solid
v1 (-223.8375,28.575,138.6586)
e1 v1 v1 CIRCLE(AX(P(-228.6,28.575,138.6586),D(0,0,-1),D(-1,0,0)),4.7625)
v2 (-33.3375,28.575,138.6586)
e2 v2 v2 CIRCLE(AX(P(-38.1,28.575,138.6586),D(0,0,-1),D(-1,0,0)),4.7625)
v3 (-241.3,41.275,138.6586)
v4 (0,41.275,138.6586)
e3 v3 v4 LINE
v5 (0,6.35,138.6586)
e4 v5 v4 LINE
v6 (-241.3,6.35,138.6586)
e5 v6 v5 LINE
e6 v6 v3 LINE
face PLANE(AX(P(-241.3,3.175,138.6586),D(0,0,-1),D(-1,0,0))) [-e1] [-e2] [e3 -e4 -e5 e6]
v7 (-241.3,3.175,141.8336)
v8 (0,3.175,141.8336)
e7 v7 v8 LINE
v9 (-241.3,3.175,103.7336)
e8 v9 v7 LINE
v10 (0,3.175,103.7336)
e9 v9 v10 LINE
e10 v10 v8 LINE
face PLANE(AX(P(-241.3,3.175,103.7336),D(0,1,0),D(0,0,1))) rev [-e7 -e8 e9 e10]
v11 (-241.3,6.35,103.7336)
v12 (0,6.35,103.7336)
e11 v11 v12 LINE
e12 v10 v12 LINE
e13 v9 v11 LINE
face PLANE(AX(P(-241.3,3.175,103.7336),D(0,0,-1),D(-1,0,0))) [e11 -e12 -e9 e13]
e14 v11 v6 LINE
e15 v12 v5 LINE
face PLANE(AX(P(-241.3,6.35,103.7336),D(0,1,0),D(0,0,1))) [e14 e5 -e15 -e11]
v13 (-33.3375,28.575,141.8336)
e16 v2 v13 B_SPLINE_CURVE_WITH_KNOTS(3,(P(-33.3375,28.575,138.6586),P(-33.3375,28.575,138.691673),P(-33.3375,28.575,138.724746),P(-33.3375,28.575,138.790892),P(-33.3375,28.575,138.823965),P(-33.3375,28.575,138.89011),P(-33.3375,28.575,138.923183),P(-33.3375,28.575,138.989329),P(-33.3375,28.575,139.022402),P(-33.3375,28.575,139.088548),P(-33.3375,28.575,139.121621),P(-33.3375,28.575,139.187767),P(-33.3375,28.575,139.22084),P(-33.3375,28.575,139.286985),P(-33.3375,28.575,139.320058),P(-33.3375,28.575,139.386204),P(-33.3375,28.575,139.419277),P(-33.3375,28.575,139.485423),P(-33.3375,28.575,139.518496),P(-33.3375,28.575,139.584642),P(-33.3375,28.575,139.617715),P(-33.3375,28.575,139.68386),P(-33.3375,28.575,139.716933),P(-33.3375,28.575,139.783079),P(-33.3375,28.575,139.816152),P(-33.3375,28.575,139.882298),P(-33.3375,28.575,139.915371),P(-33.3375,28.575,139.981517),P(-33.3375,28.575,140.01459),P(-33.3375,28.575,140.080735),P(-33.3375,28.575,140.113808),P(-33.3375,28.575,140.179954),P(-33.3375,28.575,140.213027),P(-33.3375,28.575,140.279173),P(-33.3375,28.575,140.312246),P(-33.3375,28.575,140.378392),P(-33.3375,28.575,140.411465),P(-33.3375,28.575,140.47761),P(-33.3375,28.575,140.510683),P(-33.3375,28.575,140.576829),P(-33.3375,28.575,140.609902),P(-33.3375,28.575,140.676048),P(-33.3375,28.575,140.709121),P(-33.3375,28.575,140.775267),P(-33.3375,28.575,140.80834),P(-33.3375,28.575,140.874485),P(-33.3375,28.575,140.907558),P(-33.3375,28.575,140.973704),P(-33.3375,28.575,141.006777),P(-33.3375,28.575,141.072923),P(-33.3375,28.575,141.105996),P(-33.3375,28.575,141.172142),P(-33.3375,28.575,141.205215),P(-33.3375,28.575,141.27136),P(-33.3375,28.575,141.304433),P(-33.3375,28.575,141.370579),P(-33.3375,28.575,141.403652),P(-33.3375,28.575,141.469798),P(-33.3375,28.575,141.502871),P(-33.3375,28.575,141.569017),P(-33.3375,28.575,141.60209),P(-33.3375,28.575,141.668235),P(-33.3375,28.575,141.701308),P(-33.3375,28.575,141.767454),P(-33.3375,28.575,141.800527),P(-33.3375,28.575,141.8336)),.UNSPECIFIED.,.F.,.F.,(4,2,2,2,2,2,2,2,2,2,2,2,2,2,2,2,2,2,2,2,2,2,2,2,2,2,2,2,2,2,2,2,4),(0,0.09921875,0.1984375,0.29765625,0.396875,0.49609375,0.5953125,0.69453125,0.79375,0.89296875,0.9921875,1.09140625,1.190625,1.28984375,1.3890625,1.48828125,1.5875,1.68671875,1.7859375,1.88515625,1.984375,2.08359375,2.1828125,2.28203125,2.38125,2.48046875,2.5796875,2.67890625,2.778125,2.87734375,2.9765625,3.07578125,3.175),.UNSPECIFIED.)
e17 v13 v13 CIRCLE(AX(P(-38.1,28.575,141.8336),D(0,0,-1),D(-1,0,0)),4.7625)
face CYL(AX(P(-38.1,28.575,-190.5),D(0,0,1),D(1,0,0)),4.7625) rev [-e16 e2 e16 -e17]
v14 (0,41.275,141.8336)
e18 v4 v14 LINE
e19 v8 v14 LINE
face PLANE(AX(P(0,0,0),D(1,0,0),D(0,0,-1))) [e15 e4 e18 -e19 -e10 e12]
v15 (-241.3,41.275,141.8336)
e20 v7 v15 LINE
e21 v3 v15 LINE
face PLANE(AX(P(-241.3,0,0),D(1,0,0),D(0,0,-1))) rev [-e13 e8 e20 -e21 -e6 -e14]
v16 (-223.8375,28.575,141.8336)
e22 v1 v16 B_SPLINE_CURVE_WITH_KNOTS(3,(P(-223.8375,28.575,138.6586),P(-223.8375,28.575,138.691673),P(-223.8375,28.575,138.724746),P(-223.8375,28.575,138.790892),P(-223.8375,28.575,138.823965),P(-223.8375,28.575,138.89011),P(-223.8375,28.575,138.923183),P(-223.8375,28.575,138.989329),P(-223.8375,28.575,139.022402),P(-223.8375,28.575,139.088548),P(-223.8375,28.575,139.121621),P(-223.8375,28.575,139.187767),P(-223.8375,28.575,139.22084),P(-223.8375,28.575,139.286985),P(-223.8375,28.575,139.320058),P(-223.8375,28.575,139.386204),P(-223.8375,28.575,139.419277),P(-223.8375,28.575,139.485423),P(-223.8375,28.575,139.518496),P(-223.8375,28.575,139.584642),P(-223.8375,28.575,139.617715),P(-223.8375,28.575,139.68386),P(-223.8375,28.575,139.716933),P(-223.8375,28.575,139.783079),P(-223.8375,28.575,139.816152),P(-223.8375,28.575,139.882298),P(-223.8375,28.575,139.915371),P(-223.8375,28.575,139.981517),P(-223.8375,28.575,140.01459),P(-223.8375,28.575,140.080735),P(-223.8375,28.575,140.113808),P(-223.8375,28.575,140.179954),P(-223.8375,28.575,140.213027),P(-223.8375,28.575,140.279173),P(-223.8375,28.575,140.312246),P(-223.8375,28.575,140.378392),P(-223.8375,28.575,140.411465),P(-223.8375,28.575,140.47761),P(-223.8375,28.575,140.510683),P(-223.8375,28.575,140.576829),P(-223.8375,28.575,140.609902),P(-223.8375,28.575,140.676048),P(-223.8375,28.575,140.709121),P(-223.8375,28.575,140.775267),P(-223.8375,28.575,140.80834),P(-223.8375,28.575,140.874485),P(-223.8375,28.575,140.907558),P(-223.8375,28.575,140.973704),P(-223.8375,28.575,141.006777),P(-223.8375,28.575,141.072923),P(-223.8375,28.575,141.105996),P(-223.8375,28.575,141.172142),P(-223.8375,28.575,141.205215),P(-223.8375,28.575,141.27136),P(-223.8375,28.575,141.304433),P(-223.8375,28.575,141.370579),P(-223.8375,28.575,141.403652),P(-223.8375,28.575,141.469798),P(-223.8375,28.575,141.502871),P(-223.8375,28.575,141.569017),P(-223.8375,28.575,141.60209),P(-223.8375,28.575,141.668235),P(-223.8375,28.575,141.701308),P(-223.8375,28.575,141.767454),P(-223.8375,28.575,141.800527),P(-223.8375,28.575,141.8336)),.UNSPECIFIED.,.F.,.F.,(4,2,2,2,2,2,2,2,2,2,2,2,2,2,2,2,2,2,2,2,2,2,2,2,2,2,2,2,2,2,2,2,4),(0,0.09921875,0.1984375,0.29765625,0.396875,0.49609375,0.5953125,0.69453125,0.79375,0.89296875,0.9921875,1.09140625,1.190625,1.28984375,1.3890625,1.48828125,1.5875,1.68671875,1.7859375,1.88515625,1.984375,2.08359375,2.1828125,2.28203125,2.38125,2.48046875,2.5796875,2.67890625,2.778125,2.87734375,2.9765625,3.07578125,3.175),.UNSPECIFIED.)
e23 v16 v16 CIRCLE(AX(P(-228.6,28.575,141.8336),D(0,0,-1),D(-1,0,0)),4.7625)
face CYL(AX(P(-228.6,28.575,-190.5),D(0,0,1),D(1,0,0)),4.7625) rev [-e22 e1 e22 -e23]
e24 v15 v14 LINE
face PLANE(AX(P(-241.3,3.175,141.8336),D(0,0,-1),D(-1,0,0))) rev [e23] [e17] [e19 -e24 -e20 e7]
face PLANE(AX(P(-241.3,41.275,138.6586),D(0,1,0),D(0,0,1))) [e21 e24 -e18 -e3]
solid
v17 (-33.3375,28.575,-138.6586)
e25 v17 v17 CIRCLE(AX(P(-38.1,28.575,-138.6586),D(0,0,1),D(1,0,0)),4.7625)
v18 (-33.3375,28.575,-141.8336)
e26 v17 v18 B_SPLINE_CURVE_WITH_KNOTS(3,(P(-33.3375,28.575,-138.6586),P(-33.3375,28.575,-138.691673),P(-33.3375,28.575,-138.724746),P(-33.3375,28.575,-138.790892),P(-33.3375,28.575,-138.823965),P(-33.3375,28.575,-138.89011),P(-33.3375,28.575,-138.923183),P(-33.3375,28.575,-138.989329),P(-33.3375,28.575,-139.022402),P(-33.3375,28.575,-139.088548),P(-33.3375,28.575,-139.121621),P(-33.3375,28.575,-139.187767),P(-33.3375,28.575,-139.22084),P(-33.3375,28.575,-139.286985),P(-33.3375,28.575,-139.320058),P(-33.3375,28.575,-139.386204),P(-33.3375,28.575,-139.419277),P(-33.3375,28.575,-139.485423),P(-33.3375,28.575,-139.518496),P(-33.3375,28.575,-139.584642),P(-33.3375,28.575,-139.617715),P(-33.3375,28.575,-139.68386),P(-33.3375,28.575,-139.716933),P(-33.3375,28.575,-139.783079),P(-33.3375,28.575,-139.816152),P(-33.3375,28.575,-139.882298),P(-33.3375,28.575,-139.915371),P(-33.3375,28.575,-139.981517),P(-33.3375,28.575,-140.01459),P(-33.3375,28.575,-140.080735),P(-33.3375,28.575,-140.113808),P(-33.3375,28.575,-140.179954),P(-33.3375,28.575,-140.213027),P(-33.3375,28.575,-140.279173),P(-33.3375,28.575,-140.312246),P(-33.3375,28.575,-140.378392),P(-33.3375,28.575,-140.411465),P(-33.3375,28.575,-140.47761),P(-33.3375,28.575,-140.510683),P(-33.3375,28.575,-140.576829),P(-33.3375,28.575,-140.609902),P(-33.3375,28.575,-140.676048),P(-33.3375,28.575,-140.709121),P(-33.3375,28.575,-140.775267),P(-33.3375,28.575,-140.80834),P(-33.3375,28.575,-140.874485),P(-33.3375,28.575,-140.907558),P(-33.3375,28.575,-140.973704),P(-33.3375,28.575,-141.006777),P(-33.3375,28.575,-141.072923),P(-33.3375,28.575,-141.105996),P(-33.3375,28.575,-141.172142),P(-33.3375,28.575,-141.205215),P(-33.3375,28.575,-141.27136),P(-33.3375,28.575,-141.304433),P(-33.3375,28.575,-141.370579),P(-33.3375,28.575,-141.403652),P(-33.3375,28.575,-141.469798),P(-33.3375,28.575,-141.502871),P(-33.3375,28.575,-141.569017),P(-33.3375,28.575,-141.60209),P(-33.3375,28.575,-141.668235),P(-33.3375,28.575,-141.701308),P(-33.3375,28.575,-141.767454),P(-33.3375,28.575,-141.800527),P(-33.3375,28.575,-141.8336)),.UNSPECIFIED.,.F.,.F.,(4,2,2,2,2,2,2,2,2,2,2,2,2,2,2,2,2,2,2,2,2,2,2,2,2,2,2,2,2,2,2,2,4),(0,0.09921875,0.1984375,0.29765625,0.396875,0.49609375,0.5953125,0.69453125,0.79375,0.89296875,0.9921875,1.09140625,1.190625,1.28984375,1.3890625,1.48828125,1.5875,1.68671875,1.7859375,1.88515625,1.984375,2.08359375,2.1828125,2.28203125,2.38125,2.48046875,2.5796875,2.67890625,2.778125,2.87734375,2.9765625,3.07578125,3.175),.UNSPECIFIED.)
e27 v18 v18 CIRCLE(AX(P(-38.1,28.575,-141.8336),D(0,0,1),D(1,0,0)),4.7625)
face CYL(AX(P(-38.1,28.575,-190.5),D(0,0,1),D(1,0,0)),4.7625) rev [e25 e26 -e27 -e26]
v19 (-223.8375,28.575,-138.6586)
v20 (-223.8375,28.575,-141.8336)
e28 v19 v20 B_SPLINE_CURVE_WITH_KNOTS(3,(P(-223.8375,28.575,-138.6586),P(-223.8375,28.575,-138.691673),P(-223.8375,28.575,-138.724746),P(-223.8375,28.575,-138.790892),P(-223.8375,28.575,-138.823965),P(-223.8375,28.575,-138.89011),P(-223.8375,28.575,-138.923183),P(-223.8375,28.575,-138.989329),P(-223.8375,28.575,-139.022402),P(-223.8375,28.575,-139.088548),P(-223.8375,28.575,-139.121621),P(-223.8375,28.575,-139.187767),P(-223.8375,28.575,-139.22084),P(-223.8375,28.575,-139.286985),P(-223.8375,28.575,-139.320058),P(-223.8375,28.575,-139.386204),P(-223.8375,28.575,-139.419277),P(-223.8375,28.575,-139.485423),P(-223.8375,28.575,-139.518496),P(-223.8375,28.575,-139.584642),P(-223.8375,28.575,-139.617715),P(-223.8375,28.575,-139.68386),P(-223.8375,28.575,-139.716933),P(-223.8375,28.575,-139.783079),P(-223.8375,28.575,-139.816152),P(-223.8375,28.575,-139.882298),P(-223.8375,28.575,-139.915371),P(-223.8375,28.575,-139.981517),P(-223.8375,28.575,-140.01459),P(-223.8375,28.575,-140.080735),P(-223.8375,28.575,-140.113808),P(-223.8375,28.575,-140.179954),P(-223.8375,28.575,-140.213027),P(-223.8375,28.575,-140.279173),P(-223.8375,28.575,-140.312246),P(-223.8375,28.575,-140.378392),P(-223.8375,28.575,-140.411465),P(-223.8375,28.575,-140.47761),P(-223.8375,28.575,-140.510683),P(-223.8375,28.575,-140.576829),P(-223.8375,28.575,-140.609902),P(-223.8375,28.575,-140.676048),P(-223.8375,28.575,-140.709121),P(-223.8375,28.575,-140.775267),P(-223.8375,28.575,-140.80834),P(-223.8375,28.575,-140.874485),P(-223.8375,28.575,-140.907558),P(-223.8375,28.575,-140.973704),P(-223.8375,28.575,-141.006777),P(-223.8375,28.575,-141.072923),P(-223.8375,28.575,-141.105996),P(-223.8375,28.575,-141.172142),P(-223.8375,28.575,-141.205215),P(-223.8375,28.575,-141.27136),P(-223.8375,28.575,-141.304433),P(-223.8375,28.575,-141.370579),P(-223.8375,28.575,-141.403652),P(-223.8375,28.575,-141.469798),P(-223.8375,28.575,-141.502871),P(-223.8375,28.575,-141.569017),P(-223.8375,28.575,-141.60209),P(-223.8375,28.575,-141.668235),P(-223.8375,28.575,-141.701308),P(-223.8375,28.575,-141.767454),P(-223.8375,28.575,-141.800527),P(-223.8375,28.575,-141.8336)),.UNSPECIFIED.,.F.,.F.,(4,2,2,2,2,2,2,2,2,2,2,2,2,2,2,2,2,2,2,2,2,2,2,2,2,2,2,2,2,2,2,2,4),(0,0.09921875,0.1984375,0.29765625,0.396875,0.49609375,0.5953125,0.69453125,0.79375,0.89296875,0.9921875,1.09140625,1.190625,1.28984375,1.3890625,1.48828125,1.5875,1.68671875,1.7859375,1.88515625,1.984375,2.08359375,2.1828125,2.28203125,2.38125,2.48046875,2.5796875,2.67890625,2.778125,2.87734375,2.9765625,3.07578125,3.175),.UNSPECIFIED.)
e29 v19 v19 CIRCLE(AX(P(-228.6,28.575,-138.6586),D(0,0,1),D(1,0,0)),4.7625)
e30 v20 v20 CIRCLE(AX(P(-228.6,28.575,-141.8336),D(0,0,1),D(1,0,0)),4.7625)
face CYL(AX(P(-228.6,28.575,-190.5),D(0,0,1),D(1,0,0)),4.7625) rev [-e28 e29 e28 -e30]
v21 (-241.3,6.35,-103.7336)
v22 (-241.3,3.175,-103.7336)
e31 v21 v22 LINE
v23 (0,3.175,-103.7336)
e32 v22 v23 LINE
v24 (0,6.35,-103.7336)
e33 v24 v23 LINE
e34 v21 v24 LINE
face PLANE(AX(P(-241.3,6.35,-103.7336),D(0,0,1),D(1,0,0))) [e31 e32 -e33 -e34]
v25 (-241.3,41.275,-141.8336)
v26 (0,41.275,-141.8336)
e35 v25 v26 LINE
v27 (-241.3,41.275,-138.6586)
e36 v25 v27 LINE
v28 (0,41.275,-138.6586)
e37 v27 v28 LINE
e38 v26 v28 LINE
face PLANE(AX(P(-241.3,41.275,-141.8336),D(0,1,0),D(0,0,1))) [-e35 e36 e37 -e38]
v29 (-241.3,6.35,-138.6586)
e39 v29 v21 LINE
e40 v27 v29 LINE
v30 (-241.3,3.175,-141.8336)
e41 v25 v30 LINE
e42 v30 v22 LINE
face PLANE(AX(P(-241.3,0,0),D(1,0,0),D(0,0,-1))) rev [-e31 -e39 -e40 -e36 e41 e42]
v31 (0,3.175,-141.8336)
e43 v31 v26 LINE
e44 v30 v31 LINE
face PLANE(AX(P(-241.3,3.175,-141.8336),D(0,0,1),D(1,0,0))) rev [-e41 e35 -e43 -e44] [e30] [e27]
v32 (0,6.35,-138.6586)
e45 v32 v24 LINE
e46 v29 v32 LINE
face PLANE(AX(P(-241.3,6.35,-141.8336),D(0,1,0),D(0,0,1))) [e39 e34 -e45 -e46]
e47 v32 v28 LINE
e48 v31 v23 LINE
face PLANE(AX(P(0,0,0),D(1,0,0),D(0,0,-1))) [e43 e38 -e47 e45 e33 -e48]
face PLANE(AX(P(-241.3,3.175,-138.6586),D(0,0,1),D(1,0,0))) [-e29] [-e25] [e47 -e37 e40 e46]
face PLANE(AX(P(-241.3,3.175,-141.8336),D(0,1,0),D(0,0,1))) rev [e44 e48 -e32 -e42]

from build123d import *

# Parameters (mm, degrees)
EXTRUDE_THIN1_DEPTH     = 190.5
EXTRUDE_THIN2_DEPTH     = 241.3
CUT_EXTRUDE3_DEPTH      = 311.192787835
CUT_EXTRUDE3_DEPTH_BACK = 311.192787835
SKETCH5_R               = 4.7625
CUT_EXTRUDE4_DEPTH      = 311.192787835
CUT_EXTRUDE4_DEPTH_BACK = 311.192787835
SKETCH6_W               = 38.1
SKETCH6_H               = 41.275


with BuildPart() as part:
    # Sketch1 → Extrude-Thin1 (new, symmetric)
    with BuildSketch(Plane.XY):
        Polygon((38.1, 0), (0, 0), (0, 38.1), (3.175, 38.1), (3.175, 3.175), (38.1, 3.175), align=None)
    extrude(amount=EXTRUDE_THIN1_DEPTH, both=True)

    # Sketch2 → Extrude-Thin2 (add)
    with BuildSketch(Plane.ZY):
        Polygon((103.7336, 3.175), (141.8336, 3.175), (141.8336, 41.275), (138.6586, 41.275), (138.6586, 6.35), (103.7336, 6.35), align=None)
        Polygon((-103.7336, 3.175), (-141.8336, 3.175), (-141.8336, 41.275), (-138.6586, 41.275), (-138.6586, 6.35), (-103.7336, 6.35), align=None)
    extrude(amount=EXTRUDE_THIN2_DEPTH)

    # Sketch5 → Cut-Extrude3 (cut, two sides: drawn at the far end of the back side and taken through both)
    with BuildSketch(Plane.XY.offset(-CUT_EXTRUDE3_DEPTH_BACK)):
        with Locations((-228.6, 28.575)):
            Circle(SKETCH5_R)
        with Locations((-38.1, 28.575)):
            Circle(SKETCH5_R)
    extrude(amount=CUT_EXTRUDE3_DEPTH + CUT_EXTRUDE3_DEPTH_BACK, mode=Mode.SUBTRACT)

    # Sketch6 → Cut-Extrude4 (cut, two sides: drawn at the far end of the back side and taken through both)
    with BuildSketch(Plane.XY.offset(-CUT_EXTRUDE4_DEPTH_BACK)):
        with Locations((19.05, 20.6375)):
            Rectangle(SKETCH6_W, SKETCH6_H)
    extrude(amount=CUT_EXTRUDE4_DEPTH + CUT_EXTRUDE4_DEPTH_BACK, mode=Mode.SUBTRACT)


with BuildPart() as cut_extrude4_piece_1:
    # of the separate pieces the step leaves, piece 1, a body of its own (cut_extrude4_pieces)
    add(part.part.solids().sort_by_distance((0, 3.175, 141.8336))[0])


with BuildPart() as cut_extrude4_piece_2:
    # of the separate pieces the step leaves, piece 2, a body of its own (cut_extrude4_pieces)
    add(part.part.solids().sort_by_distance((0, 41.275, -138.6586))[0])


solid = Compound([cut_extrude4_piece_1.part, cut_extrude4_piece_2.part])
